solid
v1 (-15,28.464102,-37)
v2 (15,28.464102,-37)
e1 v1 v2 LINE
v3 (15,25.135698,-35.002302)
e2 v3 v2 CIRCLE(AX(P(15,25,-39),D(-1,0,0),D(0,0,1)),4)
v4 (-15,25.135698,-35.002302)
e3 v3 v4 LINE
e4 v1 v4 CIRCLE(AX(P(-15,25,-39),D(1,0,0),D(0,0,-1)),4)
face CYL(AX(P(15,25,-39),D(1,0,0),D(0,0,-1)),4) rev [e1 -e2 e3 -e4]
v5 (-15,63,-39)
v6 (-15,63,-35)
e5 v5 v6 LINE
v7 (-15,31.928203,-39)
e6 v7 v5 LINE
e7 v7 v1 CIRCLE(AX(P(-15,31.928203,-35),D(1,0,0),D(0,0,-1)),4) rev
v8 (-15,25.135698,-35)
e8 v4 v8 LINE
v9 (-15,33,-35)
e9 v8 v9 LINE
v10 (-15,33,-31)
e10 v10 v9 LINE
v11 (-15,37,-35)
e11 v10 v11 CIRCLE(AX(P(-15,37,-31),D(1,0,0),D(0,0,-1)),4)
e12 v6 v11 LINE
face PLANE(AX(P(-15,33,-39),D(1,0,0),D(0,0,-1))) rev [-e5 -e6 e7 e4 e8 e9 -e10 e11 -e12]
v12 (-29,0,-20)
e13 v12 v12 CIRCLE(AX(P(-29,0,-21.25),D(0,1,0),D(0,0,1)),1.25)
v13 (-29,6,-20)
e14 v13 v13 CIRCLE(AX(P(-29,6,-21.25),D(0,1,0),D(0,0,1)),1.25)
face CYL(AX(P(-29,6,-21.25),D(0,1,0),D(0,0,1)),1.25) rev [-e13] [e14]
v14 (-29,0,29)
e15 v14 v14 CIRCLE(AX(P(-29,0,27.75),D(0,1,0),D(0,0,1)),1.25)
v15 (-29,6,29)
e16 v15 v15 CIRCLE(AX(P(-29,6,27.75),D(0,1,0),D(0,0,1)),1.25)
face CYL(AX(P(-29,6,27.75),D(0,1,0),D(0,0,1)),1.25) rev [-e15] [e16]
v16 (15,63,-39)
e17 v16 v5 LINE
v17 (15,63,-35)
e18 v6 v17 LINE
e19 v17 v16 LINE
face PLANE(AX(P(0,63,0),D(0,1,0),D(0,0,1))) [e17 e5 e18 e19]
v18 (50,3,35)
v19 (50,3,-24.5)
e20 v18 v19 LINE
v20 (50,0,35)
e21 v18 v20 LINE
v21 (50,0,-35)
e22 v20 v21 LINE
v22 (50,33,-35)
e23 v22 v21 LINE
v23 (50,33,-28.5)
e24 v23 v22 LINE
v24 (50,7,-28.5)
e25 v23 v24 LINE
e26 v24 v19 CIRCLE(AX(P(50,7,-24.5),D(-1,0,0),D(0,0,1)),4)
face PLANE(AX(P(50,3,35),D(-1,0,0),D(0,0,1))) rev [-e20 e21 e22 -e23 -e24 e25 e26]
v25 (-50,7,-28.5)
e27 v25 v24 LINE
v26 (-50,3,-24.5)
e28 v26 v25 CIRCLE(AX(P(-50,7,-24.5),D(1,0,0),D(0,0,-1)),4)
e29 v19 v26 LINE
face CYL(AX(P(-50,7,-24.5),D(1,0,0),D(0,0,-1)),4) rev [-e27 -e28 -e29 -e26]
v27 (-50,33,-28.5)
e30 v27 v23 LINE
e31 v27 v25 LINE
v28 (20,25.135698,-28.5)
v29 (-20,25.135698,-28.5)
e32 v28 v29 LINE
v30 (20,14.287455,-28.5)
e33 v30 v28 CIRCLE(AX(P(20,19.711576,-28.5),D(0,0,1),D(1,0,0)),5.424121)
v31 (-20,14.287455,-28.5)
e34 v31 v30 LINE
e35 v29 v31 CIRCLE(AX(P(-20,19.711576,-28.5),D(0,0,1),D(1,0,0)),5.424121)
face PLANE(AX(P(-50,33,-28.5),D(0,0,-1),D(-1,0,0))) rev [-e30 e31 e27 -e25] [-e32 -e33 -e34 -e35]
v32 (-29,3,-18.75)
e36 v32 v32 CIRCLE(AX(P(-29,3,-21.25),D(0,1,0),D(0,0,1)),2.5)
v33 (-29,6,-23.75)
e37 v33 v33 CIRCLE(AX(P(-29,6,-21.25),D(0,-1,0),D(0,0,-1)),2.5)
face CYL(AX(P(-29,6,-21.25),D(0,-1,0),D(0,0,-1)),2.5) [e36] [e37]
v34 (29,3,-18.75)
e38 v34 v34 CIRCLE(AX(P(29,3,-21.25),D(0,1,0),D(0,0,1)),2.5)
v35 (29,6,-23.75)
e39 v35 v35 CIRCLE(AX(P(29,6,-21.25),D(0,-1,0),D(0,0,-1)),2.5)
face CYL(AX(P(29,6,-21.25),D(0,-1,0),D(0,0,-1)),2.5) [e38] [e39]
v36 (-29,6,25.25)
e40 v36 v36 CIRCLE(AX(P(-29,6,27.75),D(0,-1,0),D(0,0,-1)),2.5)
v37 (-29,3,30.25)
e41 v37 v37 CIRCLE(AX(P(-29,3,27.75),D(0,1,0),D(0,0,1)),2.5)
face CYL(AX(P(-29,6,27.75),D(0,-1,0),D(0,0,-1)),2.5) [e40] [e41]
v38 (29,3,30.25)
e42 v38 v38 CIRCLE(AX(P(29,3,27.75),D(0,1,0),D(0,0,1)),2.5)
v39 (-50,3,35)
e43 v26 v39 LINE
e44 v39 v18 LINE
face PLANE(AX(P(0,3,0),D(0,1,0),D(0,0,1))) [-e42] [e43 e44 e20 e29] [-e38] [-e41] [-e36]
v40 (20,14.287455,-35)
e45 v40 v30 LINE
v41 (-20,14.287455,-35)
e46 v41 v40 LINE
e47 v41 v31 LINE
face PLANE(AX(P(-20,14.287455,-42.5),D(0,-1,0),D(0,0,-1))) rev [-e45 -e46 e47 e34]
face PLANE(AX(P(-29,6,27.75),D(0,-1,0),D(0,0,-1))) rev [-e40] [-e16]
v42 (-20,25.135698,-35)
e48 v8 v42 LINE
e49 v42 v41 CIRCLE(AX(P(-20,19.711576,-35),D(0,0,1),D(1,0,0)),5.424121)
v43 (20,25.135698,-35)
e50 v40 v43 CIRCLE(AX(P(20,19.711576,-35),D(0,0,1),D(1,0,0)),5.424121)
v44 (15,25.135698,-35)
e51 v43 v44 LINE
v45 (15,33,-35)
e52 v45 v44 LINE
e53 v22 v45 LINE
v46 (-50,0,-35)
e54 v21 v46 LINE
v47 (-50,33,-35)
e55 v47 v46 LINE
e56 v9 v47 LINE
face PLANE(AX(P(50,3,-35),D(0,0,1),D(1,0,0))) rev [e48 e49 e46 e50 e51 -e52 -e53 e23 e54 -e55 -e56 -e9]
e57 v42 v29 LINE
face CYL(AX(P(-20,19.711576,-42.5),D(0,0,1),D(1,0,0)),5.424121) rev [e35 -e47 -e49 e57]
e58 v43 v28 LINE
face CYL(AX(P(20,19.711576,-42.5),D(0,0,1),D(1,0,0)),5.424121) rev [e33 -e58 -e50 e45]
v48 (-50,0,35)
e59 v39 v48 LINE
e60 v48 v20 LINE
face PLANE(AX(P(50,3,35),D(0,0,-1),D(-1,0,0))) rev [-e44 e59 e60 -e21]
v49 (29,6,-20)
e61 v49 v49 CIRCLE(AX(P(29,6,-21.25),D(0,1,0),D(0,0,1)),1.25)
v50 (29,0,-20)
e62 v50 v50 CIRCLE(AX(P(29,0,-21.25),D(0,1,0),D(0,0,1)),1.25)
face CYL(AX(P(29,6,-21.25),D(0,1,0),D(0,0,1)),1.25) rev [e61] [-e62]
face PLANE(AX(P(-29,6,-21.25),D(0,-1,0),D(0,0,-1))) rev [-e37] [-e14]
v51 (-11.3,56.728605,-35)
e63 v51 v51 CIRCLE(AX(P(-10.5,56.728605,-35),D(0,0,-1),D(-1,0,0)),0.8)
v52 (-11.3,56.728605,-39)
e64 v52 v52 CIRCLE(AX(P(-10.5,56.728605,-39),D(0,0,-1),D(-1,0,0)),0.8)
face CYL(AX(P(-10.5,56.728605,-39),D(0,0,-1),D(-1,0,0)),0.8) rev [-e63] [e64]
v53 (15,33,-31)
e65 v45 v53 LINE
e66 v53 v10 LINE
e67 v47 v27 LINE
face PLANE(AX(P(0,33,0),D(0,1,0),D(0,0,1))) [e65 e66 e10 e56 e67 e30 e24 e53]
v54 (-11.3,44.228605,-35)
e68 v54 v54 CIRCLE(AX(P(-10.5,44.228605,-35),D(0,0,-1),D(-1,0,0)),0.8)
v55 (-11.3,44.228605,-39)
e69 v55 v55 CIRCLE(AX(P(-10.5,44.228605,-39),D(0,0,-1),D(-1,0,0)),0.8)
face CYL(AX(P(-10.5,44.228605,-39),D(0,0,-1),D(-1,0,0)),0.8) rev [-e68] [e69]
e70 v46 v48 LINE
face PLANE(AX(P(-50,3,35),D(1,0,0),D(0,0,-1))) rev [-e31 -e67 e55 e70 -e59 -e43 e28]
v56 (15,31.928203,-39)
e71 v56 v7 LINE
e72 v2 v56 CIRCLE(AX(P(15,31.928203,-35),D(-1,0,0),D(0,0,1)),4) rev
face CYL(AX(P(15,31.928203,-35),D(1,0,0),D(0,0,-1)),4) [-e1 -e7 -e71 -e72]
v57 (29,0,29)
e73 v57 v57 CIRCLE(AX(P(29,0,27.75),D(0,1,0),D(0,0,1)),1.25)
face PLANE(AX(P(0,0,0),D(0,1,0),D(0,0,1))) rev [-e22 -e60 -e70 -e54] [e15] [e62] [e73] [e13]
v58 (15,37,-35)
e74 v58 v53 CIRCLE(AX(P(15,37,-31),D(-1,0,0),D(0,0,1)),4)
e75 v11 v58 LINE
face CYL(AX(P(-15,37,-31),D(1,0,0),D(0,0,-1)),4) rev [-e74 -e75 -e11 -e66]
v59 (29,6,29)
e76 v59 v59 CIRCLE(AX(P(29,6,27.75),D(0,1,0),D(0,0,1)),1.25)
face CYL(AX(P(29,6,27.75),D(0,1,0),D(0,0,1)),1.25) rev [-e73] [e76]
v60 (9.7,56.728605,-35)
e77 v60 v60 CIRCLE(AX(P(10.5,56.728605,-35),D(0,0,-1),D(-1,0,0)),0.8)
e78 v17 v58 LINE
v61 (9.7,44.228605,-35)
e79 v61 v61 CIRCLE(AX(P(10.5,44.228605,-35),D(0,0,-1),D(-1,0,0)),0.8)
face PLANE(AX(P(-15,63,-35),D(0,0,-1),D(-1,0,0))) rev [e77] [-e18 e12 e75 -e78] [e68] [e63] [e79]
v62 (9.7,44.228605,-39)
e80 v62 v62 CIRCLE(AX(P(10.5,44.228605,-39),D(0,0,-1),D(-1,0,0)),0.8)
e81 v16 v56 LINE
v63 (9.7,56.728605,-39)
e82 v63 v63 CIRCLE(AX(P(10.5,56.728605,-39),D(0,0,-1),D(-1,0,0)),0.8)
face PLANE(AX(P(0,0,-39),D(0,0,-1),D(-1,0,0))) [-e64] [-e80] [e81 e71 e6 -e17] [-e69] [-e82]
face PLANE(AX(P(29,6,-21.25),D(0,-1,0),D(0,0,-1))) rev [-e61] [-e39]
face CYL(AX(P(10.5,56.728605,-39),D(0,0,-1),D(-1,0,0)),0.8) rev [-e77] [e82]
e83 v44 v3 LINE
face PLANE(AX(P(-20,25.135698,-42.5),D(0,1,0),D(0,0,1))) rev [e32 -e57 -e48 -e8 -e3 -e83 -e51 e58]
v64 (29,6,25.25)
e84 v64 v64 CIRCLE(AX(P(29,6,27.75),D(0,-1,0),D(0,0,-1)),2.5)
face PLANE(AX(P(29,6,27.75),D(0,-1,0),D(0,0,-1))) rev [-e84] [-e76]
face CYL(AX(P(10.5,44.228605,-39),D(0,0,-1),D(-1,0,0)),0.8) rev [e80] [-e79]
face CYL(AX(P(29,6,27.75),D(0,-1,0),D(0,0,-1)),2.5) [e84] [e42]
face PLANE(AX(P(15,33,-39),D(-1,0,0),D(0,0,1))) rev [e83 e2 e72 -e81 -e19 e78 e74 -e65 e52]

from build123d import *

# Parameters (mm, degrees)
SKETCH1_W                 = 100
SKETCH1_H                 = 70
BOSS_EXTRUDE1_DEPTH       = 3
SKETCH2_W                 = 100
SKETCH2_H                 = 6.5
BOSS_EXTRUDE2_DEPTH       = 30
SKETCH14_R                = 2.5
BOSS_EXTRUDE5_DEPTH       = 3
F_2_5MM_DOWEL_HOLE4_D     = 2.5
SKETCH21_W                = 30
SKETCH21_H                = 4
BOSS_EXTRUDE6_DEPTH       = 4
SKETCH22_W                = 30
SKETCH22_H                = 4
BOSS_EXTRUDE7_DEPTH       = 30
FILLET6_R                 = 4
FILLET7_R                 = 4
FILLET8_R                 = 4
M2X0_4_TAPPED_HOLE1_D     = 1.6
M2X0_4_TAPPED_HOLE1_DEPTH = 13
M2X0_4_TAPPED_HOLE1_TIP   = 0.480688495
FILLET9_R                 = 4
CUT_EXTRUDE10_DEPTH       = 14


with BuildPart() as part:
    # Sketch1 → Boss-Extrude1 (new body)
    with BuildSketch(Plane(origin=(0, 0, 0), x_dir=(1, 0, 0), z_dir=(0, 1, 0))):
        Rectangle(SKETCH1_W, SKETCH1_H)
    extrude(amount=BOSS_EXTRUDE1_DEPTH)

    # Sketch2 → Boss-Extrude2 (add)
    with BuildSketch(Plane(origin=(0, 3, 0), x_dir=(1, 0, 0), z_dir=(0, 1, 0))):
        with Locations((0, 31.75)):
            Rectangle(SKETCH2_W, SKETCH2_H)
    extrude(amount=BOSS_EXTRUDE2_DEPTH)

    # Sketch14 → Boss-Extrude5 (add)
    with BuildSketch(Plane(origin=(0, 3, -3), x_dir=(1, 0, 0), z_dir=(0, -1, 0))):
        with Locations(Location((-29, -18.25, 0), (0, 0, 270))):
            Circle(SKETCH14_R)
        with Locations(Location((-29, 30.75, 0), (0, 0, 270))):
            Circle(SKETCH14_R)
        with Locations(Location((29, -18.25, 0), (0, 0, 270))):
            Circle(SKETCH14_R)
        with Locations(Location((29, 30.75, 0), (0, 0, 270))):
            Circle(SKETCH14_R)
    extrude(amount=-BOSS_EXTRUDE5_DEPTH)

    # Ø2.5mm Dowel Hole4 (through all)
    with Locations(Plane(origin=(0, 6, 0), x_dir=(1, 0, 0), z_dir=(0, 1, 0))):
        with Locations((-29, 21.25), (29, 21.25), (29, -27.75), (-29, -27.75)):
            Hole(F_2_5MM_DOWEL_HOLE4_D / 2)

    # Sketch21 → Boss-Extrude6 (add)
    with BuildSketch(Plane(origin=(0, 0, -35), x_dir=(-1, 0, 0), z_dir=(0, 0, -1))):
        with Locations((0, 31)):
            Rectangle(SKETCH21_W, SKETCH21_H)
    extrude(amount=BOSS_EXTRUDE6_DEPTH)

    # Sketch22 → Boss-Extrude7 (add)
    with BuildSketch(Plane(origin=(0, 33, 0), x_dir=(1, 0, 0), z_dir=(0, 1, 0))):
        with Locations((0, 37)):
            Rectangle(SKETCH22_W, SKETCH22_H)
    extrude(amount=BOSS_EXTRUDE7_DEPTH)

    # Fillet6
    fillet6_edges = [part.edges().sort_by_distance(p)[0] for p in [
        (0, 33, -35),
    ]]
    fillet(fillet6_edges, radius=FILLET6_R)

    # Fillet7
    fillet7_edges = [part.edges().sort_by_distance(p)[0] for p in [
        (0, 29, -35),
    ]]
    fillet(fillet7_edges, radius=FILLET7_R - 0.0001)  # a hair under: the kernel refuses the full size

    # Fillet8
    fillet8_edges = [part.edges().sort_by_distance(p)[0] for p in [
        (0, 29, -39),
    ]]
    fillet(fillet8_edges, radius=FILLET8_R)

    # M2x0.4 Tapped Hole1
    with Locations(Plane(origin=(0, 0, -39), x_dir=(-1, 0, 0), z_dir=(0, 0, -1))):
        with Locations((-10.5, 56.728604695), (10.5, 56.728604695), (10.5, 44.228604695), (-10.5, 44.228604695)):
            Hole(M2X0_4_TAPPED_HOLE1_D / 2, depth=M2X0_4_TAPPED_HOLE1_DEPTH)
            with Locations((0, 0, -(M2X0_4_TAPPED_HOLE1_DEPTH + M2X0_4_TAPPED_HOLE1_TIP / 2))):  # 118° drill point
                Cone(0, M2X0_4_TAPPED_HOLE1_D / 2, M2X0_4_TAPPED_HOLE1_TIP, mode=Mode.SUBTRACT)

    # Fillet9
    fillet9_edges = [part.edges().sort_by_distance(p)[0] for p in [
        (0, 3, -28.5),
    ]]
    fillet(fillet9_edges, radius=FILLET9_R)

    # Sketch28 → Cut-Extrude10 (cut)
    with BuildSketch(Plane.XY.offset(-28.5)):
        with BuildLine():
            Line((-20, 25.135697653), (20, 25.135697653))
            ThreePointArc((20, 25.135697653), (25.424121319, 19.711576334), (20, 14.287455015))
            Line((20, 14.287455015), (-20, 14.287455015))
            ThreePointArc((-20, 14.287455015), (-25.424121319, 19.711576334), (-20, 25.135697653))
        make_face()
    extrude(amount=-CUT_EXTRUDE10_DEPTH, mode=Mode.SUBTRACT)


solid = part.part
